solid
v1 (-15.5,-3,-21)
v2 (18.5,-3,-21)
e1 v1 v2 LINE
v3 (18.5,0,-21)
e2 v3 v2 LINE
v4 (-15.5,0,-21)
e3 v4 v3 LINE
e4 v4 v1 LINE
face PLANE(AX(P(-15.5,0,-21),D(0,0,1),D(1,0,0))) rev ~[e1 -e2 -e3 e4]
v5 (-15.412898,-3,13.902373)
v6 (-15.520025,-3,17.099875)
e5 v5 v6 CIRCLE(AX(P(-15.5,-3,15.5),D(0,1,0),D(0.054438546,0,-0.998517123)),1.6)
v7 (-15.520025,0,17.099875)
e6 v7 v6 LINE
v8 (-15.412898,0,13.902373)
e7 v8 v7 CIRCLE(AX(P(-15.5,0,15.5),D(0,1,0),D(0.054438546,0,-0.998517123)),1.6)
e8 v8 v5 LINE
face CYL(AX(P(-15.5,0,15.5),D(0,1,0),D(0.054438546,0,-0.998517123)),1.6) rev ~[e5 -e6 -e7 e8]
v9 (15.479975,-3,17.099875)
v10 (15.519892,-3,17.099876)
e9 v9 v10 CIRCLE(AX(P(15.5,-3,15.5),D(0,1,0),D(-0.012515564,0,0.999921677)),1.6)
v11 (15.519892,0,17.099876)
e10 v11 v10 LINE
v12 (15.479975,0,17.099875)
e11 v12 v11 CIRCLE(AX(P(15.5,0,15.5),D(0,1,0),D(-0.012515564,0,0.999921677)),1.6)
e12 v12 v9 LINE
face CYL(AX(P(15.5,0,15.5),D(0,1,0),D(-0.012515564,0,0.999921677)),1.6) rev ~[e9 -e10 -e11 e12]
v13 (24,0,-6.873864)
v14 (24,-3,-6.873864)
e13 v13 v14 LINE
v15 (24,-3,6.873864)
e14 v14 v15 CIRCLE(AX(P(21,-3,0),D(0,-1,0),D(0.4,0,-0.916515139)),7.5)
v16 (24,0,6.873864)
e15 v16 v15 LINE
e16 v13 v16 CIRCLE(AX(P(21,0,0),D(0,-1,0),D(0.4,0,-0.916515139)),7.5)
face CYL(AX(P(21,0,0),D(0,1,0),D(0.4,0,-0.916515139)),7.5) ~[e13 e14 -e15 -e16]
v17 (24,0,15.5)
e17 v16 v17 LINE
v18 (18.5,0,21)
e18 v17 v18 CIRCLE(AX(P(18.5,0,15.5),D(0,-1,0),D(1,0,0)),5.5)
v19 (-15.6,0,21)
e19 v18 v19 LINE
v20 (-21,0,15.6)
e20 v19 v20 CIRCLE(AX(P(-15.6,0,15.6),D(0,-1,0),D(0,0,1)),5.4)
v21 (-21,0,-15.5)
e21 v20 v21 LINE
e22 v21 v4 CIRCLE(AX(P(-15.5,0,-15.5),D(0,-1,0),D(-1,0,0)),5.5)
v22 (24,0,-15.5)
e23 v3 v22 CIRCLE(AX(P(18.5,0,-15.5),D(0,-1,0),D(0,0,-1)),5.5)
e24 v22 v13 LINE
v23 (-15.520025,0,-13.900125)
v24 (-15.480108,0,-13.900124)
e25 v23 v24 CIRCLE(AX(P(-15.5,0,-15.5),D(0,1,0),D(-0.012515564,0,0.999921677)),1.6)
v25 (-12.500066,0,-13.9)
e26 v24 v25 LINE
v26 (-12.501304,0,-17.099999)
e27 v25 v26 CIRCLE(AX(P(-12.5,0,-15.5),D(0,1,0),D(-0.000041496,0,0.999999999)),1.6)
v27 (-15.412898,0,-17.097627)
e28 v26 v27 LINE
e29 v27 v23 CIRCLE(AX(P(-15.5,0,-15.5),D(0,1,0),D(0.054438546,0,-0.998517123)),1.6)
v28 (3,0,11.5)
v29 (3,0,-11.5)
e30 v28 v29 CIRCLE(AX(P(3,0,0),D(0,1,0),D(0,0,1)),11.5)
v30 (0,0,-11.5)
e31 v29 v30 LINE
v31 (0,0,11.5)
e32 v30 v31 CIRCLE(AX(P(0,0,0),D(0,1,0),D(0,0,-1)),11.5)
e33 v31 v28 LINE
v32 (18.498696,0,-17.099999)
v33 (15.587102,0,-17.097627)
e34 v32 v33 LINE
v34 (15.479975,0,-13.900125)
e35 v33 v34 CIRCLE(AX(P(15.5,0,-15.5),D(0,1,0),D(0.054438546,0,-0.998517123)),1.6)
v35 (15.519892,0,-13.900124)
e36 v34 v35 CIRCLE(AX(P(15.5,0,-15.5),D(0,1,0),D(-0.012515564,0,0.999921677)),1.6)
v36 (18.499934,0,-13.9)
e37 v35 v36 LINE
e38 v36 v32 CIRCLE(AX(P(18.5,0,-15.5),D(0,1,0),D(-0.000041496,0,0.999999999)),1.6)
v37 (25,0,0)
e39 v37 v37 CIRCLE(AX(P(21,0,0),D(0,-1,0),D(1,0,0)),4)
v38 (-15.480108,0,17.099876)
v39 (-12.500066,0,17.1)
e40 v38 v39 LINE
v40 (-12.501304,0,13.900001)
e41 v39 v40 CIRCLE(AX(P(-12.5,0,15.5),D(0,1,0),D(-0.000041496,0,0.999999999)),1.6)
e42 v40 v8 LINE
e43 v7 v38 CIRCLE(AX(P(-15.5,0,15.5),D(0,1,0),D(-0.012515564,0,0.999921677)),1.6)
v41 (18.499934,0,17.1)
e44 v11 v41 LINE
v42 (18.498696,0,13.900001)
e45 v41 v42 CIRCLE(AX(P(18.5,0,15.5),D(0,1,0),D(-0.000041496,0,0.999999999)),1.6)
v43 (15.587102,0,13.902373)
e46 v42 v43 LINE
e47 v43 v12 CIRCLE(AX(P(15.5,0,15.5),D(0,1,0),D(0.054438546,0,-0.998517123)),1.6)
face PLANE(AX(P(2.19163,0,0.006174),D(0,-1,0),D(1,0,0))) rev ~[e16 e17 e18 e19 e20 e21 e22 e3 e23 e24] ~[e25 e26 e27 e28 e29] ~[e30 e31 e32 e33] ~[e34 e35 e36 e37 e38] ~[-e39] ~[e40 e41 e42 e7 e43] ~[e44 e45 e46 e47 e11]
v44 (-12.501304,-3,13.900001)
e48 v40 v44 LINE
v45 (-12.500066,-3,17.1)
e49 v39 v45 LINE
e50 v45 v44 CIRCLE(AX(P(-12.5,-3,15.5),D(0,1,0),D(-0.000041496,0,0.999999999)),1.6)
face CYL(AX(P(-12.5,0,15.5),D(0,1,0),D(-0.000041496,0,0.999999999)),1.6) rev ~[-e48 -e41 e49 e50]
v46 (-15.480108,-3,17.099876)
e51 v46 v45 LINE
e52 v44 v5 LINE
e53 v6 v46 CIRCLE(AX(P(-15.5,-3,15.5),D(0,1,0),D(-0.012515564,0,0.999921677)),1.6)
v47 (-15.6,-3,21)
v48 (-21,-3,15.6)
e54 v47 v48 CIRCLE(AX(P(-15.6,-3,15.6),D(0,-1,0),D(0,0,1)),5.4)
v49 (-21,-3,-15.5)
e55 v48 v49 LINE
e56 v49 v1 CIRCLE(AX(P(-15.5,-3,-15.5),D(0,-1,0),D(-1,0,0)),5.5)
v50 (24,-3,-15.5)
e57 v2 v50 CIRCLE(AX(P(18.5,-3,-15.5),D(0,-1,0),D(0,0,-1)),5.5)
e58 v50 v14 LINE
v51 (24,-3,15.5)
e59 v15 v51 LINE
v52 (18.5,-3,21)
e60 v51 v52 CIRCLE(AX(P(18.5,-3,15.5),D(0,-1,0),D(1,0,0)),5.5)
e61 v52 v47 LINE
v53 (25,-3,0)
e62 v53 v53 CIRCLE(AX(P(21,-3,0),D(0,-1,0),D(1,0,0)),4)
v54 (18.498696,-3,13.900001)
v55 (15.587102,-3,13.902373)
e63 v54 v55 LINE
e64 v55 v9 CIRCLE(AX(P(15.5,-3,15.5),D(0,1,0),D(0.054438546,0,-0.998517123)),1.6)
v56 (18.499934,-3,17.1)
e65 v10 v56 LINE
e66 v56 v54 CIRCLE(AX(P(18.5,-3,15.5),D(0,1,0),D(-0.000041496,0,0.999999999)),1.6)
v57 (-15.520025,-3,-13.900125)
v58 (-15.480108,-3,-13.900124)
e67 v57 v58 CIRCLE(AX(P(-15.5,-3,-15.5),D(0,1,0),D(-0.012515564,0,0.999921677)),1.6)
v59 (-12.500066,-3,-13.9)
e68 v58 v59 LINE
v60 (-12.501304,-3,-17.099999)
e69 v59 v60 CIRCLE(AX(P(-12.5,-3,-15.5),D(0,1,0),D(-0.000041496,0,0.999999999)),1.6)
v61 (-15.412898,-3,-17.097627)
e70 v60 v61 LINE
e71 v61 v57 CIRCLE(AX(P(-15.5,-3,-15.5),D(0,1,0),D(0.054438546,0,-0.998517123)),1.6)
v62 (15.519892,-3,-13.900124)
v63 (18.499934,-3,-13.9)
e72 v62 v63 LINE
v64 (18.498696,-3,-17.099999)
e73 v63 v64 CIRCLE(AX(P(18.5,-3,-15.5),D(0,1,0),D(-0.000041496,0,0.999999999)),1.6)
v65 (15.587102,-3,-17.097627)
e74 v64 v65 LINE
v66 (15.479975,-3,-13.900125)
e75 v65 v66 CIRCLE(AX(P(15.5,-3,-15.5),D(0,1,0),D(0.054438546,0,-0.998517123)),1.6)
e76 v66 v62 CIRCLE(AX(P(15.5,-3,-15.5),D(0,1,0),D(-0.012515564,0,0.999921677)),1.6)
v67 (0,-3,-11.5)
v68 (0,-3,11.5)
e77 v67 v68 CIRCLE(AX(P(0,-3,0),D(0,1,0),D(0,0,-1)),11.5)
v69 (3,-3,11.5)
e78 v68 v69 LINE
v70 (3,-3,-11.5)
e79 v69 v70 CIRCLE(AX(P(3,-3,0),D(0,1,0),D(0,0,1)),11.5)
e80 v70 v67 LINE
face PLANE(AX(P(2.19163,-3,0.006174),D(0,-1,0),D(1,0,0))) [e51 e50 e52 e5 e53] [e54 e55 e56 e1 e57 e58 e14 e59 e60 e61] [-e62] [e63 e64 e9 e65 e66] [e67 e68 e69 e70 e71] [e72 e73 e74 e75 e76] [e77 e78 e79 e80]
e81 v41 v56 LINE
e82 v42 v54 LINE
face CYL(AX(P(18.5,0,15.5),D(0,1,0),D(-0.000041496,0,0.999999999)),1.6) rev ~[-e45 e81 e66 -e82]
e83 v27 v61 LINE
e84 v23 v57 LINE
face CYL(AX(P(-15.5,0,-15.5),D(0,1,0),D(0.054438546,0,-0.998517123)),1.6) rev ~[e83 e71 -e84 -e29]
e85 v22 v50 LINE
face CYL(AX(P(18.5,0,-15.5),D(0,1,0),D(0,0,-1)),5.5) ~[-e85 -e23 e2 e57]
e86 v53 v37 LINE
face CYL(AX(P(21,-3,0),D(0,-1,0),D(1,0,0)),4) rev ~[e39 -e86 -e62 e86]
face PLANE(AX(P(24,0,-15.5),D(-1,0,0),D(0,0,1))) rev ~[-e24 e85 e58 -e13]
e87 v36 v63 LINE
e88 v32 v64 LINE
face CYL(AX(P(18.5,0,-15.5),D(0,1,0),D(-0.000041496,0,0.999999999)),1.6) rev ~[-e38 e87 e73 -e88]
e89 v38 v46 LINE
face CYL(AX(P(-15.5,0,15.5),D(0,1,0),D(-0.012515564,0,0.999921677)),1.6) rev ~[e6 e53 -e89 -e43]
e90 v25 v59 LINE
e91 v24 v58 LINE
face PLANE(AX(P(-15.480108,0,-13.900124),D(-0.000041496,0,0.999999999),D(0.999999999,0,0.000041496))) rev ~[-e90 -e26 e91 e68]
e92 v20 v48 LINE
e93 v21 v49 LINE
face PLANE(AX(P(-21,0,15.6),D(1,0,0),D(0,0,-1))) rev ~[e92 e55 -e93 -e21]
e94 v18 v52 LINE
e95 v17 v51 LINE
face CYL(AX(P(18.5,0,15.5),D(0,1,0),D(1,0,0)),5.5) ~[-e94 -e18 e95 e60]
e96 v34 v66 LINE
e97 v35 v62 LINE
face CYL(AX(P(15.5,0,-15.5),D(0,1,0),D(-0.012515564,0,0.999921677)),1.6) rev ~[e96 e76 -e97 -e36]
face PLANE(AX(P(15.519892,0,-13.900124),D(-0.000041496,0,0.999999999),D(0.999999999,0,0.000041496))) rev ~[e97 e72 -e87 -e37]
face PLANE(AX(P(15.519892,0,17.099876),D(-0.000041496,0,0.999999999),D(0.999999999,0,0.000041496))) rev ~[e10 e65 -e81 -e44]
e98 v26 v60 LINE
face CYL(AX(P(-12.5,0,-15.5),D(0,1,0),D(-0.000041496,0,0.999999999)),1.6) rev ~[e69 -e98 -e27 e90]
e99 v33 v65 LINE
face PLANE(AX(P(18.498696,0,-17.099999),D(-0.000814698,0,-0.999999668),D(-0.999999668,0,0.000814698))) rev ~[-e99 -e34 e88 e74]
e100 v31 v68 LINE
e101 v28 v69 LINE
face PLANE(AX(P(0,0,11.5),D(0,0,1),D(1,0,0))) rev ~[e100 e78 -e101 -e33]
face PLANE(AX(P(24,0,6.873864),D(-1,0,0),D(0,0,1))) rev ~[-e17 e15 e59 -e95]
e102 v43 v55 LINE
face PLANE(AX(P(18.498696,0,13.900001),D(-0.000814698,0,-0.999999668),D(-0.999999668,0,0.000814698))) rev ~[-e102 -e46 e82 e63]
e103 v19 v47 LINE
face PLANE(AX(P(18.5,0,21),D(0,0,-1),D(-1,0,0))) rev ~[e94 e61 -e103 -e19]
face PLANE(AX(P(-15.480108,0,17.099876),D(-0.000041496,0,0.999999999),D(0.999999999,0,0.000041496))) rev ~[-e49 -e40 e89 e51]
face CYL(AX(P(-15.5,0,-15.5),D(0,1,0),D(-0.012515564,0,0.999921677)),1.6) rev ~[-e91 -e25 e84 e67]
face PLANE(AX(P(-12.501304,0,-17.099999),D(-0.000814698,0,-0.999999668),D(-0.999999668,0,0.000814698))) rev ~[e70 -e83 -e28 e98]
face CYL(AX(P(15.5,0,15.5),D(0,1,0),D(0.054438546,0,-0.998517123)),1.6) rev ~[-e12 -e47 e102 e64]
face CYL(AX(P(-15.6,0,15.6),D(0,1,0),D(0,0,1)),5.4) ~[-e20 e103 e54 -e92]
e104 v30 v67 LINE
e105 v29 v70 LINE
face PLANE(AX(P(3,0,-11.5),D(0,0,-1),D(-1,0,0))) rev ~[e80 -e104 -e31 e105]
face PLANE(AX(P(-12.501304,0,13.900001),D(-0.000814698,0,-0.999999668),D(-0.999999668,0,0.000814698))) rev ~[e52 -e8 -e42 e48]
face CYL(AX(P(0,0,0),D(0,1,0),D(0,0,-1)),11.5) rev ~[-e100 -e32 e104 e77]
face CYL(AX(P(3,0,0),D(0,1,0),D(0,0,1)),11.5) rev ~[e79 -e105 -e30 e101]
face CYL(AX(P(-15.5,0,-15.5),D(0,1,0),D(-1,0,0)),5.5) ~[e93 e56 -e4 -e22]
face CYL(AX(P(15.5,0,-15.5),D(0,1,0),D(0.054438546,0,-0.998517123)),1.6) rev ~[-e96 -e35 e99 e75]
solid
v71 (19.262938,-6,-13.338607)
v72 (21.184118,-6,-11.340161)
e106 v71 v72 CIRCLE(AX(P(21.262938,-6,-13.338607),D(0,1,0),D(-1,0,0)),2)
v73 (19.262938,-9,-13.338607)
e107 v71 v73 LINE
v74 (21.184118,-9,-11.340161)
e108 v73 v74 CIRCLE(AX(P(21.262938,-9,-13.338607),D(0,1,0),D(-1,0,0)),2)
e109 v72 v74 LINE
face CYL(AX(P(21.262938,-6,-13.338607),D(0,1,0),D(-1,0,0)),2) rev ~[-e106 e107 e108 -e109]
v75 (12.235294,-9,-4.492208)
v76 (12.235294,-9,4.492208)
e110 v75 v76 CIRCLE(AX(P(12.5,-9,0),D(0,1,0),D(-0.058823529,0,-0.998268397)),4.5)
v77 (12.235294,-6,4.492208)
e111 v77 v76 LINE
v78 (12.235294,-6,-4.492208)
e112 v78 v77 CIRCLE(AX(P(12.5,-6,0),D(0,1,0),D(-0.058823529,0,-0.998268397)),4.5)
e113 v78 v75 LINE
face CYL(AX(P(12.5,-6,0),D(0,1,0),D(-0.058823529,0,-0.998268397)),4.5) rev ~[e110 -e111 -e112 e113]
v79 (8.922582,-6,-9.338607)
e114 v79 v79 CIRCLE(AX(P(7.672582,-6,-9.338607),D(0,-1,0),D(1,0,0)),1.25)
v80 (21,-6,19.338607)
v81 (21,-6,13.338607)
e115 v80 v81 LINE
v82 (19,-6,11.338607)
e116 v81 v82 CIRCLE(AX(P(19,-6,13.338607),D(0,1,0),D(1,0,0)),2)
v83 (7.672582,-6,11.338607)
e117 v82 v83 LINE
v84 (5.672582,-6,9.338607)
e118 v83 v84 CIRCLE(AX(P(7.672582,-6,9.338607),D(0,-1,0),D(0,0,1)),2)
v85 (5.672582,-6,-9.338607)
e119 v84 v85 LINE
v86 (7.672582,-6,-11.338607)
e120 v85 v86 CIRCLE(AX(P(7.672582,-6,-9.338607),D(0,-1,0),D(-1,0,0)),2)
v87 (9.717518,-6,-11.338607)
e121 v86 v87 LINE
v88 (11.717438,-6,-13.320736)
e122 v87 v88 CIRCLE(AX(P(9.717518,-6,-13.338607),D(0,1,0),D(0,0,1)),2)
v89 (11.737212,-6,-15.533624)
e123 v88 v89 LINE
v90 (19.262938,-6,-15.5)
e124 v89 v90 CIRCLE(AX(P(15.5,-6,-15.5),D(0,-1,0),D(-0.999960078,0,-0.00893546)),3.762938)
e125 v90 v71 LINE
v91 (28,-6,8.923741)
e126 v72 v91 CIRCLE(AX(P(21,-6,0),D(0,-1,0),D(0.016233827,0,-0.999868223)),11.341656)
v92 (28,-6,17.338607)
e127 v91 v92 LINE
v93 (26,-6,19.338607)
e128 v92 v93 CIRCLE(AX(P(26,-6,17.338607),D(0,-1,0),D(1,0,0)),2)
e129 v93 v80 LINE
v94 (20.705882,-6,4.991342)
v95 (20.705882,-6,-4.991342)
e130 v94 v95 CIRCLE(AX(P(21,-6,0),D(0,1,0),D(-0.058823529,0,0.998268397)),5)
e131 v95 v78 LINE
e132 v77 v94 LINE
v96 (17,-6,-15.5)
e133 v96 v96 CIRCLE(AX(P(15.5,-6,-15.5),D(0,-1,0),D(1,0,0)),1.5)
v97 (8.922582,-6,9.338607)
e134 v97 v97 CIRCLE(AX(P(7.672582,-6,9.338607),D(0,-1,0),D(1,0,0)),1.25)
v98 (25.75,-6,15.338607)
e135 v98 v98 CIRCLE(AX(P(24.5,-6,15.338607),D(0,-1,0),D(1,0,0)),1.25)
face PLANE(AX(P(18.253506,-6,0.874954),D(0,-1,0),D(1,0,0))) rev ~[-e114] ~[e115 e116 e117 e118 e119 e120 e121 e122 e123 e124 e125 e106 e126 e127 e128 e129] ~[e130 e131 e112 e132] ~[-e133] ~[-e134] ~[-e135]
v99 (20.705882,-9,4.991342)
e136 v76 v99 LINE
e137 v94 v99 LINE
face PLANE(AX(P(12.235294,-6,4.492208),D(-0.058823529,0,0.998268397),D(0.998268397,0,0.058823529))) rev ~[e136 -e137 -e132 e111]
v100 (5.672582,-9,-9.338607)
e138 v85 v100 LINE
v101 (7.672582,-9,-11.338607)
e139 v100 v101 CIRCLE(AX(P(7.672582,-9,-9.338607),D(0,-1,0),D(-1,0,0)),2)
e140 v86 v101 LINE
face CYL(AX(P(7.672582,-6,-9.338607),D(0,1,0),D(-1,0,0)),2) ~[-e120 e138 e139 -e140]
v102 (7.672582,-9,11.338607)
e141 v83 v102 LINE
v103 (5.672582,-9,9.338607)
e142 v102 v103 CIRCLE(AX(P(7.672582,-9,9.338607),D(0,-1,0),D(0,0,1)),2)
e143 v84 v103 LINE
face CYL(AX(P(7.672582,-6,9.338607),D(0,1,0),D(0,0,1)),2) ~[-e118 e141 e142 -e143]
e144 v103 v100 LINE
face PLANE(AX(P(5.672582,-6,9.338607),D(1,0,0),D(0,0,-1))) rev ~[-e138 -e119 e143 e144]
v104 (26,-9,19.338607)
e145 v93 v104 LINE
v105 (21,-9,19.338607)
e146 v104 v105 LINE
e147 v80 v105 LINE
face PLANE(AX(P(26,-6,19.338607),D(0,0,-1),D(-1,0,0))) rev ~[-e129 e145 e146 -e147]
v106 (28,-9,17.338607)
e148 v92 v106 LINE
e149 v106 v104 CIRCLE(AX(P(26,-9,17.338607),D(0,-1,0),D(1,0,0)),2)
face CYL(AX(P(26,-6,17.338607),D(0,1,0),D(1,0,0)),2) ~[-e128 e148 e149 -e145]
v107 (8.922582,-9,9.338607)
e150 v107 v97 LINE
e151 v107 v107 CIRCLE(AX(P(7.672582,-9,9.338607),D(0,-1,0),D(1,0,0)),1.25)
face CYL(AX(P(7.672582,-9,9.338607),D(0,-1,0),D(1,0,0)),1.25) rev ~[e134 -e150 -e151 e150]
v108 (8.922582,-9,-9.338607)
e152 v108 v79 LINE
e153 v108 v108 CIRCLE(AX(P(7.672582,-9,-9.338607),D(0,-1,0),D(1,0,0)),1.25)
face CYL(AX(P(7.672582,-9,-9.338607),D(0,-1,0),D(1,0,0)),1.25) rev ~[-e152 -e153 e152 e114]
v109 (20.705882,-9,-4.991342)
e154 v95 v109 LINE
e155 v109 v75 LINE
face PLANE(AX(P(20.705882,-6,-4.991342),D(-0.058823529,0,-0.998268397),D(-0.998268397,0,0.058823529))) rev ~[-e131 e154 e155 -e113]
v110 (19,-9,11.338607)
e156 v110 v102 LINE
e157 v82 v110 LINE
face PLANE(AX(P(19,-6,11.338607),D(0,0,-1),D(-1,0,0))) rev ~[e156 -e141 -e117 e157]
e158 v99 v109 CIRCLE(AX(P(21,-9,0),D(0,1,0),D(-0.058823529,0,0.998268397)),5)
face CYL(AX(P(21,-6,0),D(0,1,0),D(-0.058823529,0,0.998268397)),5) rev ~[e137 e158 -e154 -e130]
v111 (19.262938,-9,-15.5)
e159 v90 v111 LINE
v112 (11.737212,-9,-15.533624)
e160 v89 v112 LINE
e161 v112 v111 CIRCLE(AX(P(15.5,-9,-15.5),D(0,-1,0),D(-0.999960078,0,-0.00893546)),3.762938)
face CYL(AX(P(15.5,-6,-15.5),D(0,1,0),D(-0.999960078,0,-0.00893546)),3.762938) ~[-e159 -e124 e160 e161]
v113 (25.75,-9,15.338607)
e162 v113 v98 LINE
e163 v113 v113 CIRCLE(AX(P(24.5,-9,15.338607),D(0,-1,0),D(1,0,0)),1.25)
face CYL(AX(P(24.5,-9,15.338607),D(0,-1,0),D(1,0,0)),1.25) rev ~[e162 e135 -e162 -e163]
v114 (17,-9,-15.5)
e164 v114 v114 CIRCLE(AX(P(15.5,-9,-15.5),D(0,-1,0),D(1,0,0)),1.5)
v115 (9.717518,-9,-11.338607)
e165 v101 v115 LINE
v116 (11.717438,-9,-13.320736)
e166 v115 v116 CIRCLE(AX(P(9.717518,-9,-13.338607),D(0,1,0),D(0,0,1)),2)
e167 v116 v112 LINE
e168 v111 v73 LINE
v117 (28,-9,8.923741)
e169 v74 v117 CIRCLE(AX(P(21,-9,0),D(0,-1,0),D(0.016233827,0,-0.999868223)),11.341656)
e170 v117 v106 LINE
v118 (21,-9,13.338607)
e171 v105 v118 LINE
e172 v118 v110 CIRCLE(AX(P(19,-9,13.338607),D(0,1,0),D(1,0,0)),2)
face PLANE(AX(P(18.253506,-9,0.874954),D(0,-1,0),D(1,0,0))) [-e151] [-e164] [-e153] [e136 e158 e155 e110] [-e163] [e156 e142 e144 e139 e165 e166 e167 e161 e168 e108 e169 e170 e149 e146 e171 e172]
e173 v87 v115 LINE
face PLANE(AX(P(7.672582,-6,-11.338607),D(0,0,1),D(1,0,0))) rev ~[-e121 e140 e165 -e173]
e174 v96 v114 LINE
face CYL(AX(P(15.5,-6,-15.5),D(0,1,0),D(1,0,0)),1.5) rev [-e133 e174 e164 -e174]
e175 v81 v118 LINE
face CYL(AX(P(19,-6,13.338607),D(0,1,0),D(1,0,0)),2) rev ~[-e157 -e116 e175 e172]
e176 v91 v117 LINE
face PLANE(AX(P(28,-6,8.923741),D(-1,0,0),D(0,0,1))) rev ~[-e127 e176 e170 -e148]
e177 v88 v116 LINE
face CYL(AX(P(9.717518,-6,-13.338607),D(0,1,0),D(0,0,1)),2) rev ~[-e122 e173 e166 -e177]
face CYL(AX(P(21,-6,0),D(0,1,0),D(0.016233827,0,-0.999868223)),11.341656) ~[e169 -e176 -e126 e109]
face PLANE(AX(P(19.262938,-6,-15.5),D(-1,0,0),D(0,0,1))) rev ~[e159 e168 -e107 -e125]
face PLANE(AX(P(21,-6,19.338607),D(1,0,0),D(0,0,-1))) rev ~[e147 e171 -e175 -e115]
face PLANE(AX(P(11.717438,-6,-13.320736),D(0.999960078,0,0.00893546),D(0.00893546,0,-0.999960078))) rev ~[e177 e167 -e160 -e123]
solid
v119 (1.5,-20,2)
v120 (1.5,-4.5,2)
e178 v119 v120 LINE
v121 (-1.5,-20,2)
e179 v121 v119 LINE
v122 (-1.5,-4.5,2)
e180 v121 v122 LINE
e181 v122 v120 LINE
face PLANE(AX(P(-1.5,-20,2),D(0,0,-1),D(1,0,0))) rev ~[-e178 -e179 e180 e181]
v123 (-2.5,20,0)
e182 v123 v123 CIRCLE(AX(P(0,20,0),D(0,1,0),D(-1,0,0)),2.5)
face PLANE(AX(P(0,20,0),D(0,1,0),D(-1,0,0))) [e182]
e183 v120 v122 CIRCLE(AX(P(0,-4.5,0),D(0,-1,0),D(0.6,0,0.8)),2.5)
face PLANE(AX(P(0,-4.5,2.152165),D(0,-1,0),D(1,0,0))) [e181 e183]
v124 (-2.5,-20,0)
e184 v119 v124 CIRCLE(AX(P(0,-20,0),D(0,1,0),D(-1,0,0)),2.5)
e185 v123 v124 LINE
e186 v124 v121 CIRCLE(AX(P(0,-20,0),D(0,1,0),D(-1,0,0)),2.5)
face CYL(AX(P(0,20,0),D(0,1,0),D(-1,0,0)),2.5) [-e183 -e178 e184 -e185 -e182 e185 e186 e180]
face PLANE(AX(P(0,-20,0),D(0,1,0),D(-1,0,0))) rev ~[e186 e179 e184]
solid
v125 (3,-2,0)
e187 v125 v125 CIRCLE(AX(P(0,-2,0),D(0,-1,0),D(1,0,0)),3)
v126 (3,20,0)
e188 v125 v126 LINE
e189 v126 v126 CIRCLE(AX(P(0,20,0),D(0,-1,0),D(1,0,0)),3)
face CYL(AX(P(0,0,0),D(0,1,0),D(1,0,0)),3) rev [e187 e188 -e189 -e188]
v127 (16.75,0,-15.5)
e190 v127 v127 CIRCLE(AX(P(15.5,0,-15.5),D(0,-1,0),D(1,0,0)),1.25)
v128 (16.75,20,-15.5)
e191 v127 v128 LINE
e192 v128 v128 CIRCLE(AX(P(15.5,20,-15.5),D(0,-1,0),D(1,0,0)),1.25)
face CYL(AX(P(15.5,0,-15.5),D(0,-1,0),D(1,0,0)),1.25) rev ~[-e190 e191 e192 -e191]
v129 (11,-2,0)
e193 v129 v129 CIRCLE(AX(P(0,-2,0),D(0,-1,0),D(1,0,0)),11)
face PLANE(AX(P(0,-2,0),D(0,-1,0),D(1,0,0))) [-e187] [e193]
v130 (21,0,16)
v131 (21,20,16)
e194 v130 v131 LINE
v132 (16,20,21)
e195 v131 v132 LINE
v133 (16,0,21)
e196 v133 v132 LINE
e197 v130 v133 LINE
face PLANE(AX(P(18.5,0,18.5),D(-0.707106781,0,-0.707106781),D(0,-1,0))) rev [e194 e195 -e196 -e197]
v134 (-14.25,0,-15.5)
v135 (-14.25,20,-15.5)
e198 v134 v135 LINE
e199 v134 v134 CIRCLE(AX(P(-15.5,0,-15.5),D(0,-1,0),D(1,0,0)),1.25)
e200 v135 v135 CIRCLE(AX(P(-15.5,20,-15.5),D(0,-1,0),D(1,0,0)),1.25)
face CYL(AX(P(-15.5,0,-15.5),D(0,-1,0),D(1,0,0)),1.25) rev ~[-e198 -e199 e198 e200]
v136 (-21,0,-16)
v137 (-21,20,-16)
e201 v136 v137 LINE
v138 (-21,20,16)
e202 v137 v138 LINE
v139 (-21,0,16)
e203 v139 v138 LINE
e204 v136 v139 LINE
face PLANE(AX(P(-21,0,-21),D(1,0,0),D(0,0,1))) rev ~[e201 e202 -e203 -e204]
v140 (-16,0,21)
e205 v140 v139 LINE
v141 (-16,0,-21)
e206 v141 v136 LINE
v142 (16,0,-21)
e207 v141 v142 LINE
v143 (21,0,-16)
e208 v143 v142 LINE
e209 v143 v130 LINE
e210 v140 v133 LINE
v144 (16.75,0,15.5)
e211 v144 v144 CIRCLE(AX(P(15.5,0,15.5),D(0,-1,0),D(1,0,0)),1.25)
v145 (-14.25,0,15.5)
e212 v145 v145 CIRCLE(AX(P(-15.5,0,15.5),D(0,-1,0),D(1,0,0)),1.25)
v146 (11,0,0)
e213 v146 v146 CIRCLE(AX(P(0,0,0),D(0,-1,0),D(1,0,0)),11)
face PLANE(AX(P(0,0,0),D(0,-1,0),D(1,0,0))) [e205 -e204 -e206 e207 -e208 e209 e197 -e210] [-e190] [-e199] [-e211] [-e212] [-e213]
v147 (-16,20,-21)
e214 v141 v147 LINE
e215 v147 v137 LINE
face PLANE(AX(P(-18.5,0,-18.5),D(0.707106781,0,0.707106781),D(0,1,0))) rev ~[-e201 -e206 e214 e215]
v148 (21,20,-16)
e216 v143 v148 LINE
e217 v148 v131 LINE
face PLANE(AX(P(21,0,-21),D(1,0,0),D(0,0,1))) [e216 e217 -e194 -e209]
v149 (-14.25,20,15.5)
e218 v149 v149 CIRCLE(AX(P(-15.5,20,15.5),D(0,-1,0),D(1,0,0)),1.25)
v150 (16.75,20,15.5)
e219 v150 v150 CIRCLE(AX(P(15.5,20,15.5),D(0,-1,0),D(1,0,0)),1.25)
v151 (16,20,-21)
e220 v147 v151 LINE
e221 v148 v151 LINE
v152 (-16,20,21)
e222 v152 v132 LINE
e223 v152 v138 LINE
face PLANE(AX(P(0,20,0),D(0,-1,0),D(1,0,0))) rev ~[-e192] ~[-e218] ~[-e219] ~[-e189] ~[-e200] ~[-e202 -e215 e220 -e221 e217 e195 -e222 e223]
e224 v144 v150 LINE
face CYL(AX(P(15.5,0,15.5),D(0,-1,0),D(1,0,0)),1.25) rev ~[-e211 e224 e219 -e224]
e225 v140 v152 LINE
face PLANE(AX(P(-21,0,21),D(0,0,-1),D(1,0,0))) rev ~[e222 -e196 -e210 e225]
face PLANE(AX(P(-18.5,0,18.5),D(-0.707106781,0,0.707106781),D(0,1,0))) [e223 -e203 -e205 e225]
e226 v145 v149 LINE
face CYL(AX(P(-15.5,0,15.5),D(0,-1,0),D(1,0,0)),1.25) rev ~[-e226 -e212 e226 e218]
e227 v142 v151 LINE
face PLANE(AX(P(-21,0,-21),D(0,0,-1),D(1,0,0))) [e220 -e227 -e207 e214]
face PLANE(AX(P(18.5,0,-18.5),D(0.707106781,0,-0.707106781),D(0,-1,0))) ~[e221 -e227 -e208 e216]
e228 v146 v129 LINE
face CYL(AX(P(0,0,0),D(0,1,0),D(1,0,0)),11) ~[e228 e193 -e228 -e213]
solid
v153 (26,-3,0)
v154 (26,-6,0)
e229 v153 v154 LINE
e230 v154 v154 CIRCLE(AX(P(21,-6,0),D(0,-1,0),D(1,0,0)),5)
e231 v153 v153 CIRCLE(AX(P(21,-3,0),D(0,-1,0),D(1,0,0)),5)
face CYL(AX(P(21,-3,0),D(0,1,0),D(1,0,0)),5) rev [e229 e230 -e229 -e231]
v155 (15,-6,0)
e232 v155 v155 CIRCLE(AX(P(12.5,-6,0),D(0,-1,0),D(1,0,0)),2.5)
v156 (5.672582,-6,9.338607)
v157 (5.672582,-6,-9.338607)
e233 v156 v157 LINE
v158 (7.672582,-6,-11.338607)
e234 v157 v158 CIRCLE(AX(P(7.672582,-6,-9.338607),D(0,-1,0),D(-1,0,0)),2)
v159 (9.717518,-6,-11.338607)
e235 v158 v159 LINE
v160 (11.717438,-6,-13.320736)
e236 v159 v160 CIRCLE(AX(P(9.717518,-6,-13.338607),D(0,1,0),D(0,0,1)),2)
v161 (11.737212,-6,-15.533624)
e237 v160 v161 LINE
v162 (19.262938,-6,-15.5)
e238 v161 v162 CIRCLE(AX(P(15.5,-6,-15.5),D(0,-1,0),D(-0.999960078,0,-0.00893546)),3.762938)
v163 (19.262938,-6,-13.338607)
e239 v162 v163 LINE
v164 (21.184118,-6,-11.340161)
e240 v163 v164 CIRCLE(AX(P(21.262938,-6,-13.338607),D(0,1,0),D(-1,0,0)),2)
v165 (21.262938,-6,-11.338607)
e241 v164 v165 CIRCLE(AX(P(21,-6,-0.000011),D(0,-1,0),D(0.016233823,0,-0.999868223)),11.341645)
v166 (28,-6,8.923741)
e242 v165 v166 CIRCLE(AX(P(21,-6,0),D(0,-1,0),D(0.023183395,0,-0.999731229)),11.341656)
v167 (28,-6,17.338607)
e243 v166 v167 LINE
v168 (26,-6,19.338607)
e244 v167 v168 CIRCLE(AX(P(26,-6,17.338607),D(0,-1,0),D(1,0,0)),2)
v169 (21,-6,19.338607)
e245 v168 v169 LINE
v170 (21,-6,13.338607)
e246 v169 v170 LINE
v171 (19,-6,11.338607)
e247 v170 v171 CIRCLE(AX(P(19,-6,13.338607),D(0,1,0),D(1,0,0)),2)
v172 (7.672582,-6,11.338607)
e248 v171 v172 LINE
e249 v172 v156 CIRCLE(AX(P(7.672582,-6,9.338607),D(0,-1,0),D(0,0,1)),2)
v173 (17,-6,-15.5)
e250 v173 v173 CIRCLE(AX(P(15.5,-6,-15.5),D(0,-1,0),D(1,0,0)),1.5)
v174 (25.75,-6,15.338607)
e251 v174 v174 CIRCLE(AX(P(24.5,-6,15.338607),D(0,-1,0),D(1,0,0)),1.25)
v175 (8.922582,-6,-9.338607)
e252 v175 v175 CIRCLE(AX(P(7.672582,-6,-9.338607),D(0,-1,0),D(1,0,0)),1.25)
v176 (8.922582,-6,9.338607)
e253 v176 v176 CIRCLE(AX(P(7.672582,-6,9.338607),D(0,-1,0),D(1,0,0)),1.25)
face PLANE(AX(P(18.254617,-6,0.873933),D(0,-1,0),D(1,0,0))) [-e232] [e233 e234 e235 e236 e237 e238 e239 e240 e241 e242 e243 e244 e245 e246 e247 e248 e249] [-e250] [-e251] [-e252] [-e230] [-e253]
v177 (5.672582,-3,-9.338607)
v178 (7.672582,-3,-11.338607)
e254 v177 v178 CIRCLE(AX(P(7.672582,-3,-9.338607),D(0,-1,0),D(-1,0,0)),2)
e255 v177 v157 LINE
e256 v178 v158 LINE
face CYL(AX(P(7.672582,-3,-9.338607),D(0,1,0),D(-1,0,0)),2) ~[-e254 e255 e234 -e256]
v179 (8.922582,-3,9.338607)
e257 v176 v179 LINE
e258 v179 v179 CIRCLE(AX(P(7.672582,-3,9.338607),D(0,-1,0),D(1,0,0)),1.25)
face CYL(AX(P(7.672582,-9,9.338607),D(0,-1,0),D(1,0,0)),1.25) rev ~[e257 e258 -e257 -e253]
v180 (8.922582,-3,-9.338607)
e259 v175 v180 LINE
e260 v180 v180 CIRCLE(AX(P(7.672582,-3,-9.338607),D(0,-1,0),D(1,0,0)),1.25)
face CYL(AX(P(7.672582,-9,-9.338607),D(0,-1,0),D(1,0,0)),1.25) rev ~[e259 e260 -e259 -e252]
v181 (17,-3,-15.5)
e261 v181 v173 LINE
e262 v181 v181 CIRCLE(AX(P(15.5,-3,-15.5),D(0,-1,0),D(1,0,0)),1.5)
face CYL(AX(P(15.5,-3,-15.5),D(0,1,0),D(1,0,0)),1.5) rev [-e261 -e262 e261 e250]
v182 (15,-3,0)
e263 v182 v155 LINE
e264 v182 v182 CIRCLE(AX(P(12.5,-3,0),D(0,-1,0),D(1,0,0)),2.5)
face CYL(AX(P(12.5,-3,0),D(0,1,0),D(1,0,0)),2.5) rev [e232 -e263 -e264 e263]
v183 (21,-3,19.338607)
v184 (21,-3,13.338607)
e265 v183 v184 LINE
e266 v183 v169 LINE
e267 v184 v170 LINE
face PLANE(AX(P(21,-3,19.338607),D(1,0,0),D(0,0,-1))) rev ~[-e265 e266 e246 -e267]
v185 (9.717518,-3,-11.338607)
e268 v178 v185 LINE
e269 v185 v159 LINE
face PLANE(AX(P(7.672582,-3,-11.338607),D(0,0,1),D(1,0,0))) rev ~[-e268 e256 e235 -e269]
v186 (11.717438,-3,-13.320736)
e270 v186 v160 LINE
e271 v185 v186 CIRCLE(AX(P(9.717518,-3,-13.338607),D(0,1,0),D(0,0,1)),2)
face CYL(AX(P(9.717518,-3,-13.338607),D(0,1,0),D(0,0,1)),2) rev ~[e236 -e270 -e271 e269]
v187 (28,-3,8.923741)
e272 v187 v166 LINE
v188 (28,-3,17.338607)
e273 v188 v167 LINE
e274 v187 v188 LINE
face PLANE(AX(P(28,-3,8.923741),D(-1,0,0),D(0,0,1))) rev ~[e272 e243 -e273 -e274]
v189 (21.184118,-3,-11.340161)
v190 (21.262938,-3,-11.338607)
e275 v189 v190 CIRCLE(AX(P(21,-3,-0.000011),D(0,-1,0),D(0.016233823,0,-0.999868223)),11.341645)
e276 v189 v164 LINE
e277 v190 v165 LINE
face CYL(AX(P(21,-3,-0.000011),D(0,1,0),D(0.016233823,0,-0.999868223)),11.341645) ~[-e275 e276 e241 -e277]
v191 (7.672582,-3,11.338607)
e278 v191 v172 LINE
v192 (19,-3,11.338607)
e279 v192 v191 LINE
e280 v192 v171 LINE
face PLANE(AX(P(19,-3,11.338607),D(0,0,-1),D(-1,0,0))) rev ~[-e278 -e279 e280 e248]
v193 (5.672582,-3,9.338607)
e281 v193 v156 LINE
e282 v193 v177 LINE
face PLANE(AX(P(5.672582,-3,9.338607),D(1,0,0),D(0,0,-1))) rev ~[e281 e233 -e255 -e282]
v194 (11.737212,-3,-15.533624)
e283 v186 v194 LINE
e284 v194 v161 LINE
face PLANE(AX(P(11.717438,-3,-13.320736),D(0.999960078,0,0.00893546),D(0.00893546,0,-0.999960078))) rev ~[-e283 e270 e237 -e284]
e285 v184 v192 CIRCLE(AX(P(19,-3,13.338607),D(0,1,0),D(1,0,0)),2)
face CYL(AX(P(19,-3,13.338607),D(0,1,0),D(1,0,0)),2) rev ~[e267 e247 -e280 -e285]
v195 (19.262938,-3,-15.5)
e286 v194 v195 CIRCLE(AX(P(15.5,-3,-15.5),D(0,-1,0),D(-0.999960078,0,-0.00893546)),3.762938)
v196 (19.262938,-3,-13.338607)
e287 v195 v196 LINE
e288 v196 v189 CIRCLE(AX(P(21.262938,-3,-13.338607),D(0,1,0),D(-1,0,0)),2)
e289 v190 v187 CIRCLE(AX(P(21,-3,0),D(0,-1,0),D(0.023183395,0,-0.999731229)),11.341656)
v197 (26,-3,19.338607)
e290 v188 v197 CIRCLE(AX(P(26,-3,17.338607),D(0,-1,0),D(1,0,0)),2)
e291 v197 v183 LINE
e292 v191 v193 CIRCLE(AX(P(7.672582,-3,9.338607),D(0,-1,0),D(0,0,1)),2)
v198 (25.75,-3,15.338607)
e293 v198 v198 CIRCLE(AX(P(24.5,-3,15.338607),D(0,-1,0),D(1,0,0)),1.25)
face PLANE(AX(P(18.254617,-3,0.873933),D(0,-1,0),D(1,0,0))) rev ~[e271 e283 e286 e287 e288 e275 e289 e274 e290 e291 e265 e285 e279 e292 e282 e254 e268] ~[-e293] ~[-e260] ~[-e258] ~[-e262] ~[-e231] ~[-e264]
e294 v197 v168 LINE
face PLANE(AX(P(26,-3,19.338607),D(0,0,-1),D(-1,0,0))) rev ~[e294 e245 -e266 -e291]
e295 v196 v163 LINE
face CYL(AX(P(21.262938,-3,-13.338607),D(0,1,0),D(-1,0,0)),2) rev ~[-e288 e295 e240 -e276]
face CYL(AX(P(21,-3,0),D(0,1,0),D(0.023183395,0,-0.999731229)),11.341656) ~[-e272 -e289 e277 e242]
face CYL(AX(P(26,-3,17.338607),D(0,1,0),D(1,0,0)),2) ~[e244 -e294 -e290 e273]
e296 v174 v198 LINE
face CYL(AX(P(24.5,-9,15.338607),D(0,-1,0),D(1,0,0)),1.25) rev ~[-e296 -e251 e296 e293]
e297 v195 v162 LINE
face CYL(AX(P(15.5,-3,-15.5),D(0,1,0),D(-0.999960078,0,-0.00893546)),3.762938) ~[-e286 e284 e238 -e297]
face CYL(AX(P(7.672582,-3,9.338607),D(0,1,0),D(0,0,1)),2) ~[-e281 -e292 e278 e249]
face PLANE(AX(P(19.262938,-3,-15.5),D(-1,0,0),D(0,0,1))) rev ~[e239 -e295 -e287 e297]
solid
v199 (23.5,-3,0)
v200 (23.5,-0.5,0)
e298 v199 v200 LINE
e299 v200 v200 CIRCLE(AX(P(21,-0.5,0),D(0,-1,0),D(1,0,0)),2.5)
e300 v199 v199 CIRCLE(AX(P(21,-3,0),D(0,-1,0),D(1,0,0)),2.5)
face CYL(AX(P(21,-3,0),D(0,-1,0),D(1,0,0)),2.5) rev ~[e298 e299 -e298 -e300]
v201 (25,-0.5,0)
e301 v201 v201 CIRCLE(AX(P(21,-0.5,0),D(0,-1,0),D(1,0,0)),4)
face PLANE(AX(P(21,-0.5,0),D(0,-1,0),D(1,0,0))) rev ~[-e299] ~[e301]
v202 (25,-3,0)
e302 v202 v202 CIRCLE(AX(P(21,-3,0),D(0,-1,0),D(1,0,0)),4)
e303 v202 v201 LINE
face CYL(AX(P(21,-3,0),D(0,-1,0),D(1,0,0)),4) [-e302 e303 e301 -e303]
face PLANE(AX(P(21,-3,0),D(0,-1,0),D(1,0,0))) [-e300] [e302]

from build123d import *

# Parameters (mm, degrees)
F0_W      = 42
F0_H      = 42
F0_R      = 1.25
F0_R_2    = 11
F0_R_3    = 3
F1_DEPTH  = 20
F2_DEPTH  = 2
F3_SIZE   = 5
F4_R      = 2.5
F5_DEPTH  = 40
F7_DEPTH  = 15.5
F9_DEPTH  = 3
F10_R     = 4
F11_DEPTH = 25
F12_R     = 4
F12_R_2   = 2.5
F13_DEPTH = 2.5
F14_R     = 1.5
F14_R_2   = 2.5
F14_R_3   = 5
F15_DEPTH = 3
F16_R     = 1.5
F17_DEPTH = 3
F18_R     = 1.25
F19_DEPTH = 25


with BuildPart() as f1:
    # F0 (on Front) → F1 (new body)
    with BuildSketch(Plane.XZ):
        Rectangle(F0_W, F0_H)
        with Locations((-15.5, -15.5)):
            Circle(F0_R, mode=Mode.SUBTRACT)
        with Locations((15.5, -15.5)):
            Circle(F0_R, mode=Mode.SUBTRACT)
        with Locations((-15.5, 15.5)):
            Circle(F0_R, mode=Mode.SUBTRACT)
        Circle(F0_R_2, mode=Mode.SUBTRACT)
        with Locations((15.5, 15.5)):
            Circle(F0_R, mode=Mode.SUBTRACT)
        Circle(F0_R_2)
        Circle(F0_R_3, mode=Mode.SUBTRACT)
    extrude(amount=-F1_DEPTH)

    # F0 (on Front) → F2 (join)
    with BuildSketch(Plane.XZ):
        Circle(F0_R_2)
        Circle(F0_R_3, mode=Mode.SUBTRACT)
    extrude(amount=F2_DEPTH)

    # F3
    f3_edges = [f1.edges().sort_by_distance(p)[0] for p in [
        (-21, 10, 21),
        (21, 10, 21),
        (21, 10, -21),
        (-21, 10, -21),
    ]]
    chamfer(f3_edges, length=F3_SIZE)


with BuildPart() as f5:
    # F4 (on face) → F5 (new body)
    with BuildSketch(Plane(origin=(0, 20, 0), x_dir=(-1, 0, 0), z_dir=(0, 1, 0))):
        Circle(F4_R)
    extrude(amount=-F5_DEPTH)

    # F6 (on face) → F7 (cut)
    with BuildSketch(Plane.XZ.offset(20)):
        with BuildLine():
            ThreePointArc((1.5, 2), (0, 2.5), (-1.5, 2))
            Line((-1.5, 2), (1.5, 2))
        make_face()
    extrude(amount=-F7_DEPTH, mode=Mode.SUBTRACT)


with BuildPart() as f9:
    # F8 (on face) → F9 (new body)
    with BuildSketch(Plane.XZ):
        with BuildLine():
            Line((-15.5, -21), (18.5, -21))
            ThreePointArc((18.5, -21), (22.3890872965, -19.3890872965), (24, -15.5))
            Line((24, -15.5), (24, -6.8738635424))
            ThreePointArc((24, -6.8738635424), (28.5, 0), (24, 6.8738635424))
            Line((24, 6.8738635424), (24, 15.5))
            ThreePointArc((24, 15.5), (22.3890872965, 19.3890872965), (18.5, 21))
            Line((18.5, 21), (-15.6, 21))
            ThreePointArc((-15.6, 21), (-19.4183766184, 19.4183766184), (-21, 15.6))
            Line((-21, 15.6), (-21, -15.5))
            ThreePointArc((-21, -15.5), (-19.3890872965, -19.3890872965), (-15.5, -21))
        make_face()
        with BuildLine():
            ThreePointArc((-15.5200249009, -13.9001253164), (-15.500066393, -13.9000000014), (-15.4801078747, -13.90012366))
            Line((-15.4801078747, -13.90012366), (-12.500066393, -13.9000000014))
            ThreePointArc((-12.500066393, -13.9000000014), (-10.9000001196, -15.5006185623), (-12.5013035174, -17.099999469))
            Line((-12.5013035174, -17.099999469), (-15.4128983262, -17.0976273966))
            ThreePointArc((-15.4128983262, -17.0976273966), (-17.0991027833, -15.5535750719), (-15.5200249009, -13.9001253164))
        make_face(mode=Mode.SUBTRACT)
        with BuildLine():
            ThreePointArc((15.4799750991, -13.9001253164), (15.499933607, -13.9000000014), (15.5198921253, -13.90012366))
            Line((15.5198921253, -13.90012366), (18.499933607, -13.9000000014))
            ThreePointArc((18.499933607, -13.9000000014), (20.0999998804, -15.5006185623), (18.4986964826, -17.099999469))
            Line((18.4986964826, -17.099999469), (15.5871016738, -17.0976273966))
            ThreePointArc((15.5871016738, -17.0976273966), (13.9008972167, -15.5535750719), (15.4799750991, -13.9001253164))
        make_face(mode=Mode.SUBTRACT)
        with BuildLine():
            ThreePointArc((3, 11.5), (14.5, 0), (3, -11.5))
            Line((3, -11.5), (0, -11.5))
            ThreePointArc((0, -11.5), (-11.5, 0), (0, 11.5))
            Line((0, 11.5), (3, 11.5))
        make_face(mode=Mode.SUBTRACT)
        with BuildLine():
            ThreePointArc((-15.5200249009, 17.0998746836), (-15.500066393, 17.0999999986), (-15.4801078747, 17.09987634))
            Line((-15.4801078747, 17.09987634), (-12.500066393, 17.0999999986))
            ThreePointArc((-12.500066393, 17.0999999986), (-10.9000001196, 15.4993814377), (-12.5013035174, 13.900000531))
            Line((-12.5013035174, 13.900000531), (-15.4128983262, 13.9023726034))
            ThreePointArc((-15.4128983262, 13.9023726034), (-17.0991027833, 15.4464249281), (-15.5200249009, 17.0998746836))
        make_face(mode=Mode.SUBTRACT)
        with BuildLine():
            ThreePointArc((15.4799750991, 17.0998746836), (15.499933607, 17.0999999986), (15.5198921253, 17.09987634))
            Line((15.5198921253, 17.09987634), (18.499933607, 17.0999999986))
            ThreePointArc((18.499933607, 17.0999999986), (20.0999998804, 15.4993814377), (18.4986964826, 13.900000531))
            Line((18.4986964826, 13.900000531), (15.5871016738, 13.9023726034))
            ThreePointArc((15.5871016738, 13.9023726034), (13.9008972167, 15.4464249281), (15.4799750991, 17.0998746836))
        make_face(mode=Mode.SUBTRACT)
    extrude(amount=F9_DEPTH)

    # F10 (on face) → F11 (cut)
    with BuildSketch(Plane.XZ.offset(3)):
        with Locations((21, 0)):
            Circle(F10_R)
    extrude(amount=-F11_DEPTH, mode=Mode.SUBTRACT)


with BuildPart() as f13:
    # F12 (on face) → F13 (new body)
    with BuildSketch(Plane.XZ.offset(3)):
        with Locations((21, 0)):
            Circle(F12_R)
        with Locations((21, 0)):
            Circle(F12_R_2, mode=Mode.SUBTRACT)
    extrude(amount=-F13_DEPTH)


with BuildPart() as f15:
    # F14 (on face) → F15 (new body)
    with BuildSketch(Plane.XZ.offset(3)):
        with BuildLine():
            Line((5.6725820601, 9.3386074081), (5.6725820601, -9.3386074081))
            ThreePointArc((5.6725820601, -9.3386074081), (6.2583684977, -10.7528209705), (7.6725820601, -11.3386074081))
            Line((7.6725820601, -11.3386074081), (9.7175180337, -11.3386074081))
            ThreePointArc((9.7175180337, -11.3386074081), (11.1253990941, -11.918089573), (11.7174381896, -13.3207364883))
            Line((11.7174381896, -13.3207364883), (11.737212143, -15.5336235823))
            ThreePointArc((11.737212143, -15.5336235823), (15.516811959, -19.2629005249), (19.2629380811, -15.5))
            Line((19.2629380811, -15.5), (19.2629380811, -13.3386074081))
            ThreePointArc((19.2629380811, -13.3386074081), (19.8211268568, -11.9525408897), (21.1841184746, -11.3401611442))
            ThreePointArc((21.1841184746, -11.3401611442), (21.2235206216, -11.3389958799), (21.2629380811, -11.3386074081))
            ThreePointArc((21.2629380811, -11.3386074081), (31.7623537708, -3.5783928938), (28, 8.9237410535))
            Line((28, 8.9237410535), (28, 17.3386074081))
            ThreePointArc((28, 17.3386074081), (27.4142135624, 18.7528209705), (26, 19.3386074081))
            Line((26, 19.3386074081), (21, 19.3386074081))
            Line((21, 19.3386074081), (21, 13.3386074081))
            ThreePointArc((21, 13.3386074081), (20.4142135624, 11.9243938457), (19, 11.3386074081))
            Line((19, 11.3386074081), (7.6725820601, 11.3386074081))
            ThreePointArc((7.6725820601, 11.3386074081), (6.2583684977, 10.7528209705), (5.6725820601, 9.3386074081))
        make_face()
        with Locations((15.5, -15.5)):
            Circle(F14_R, mode=Mode.SUBTRACT)
        with Locations((12.5, 0)):
            Circle(F14_R_2, mode=Mode.SUBTRACT)
        with Locations((21, 0)):
            Circle(F14_R_3, mode=Mode.SUBTRACT)
        with BuildLine():
            ThreePointArc((21.2629380811, -11.3386074081), (21.2235206216, -11.3389958799), (21.1841184746, -11.3401611442))
            ThreePointArc((21.1841184746, -11.3401611442), (21.2235296278, -11.33945276), (21.2629380811, -11.3386074081))
        make_face()
    extrude(amount=F15_DEPTH)


with BuildPart() as f17:
    # F16 (on face) → F17 (new body)
    with BuildSketch(Plane.XZ.offset(6)):
        with BuildLine():
            ThreePointArc((19.2629380811, -13.3386074081), (19.8211268568, -11.9525408897), (21.1841184746, -11.3401611442))
            ThreePointArc((21.1841184746, -11.3401611442), (31.7498522145, -3.6157754018), (28, 8.9237410535))
            Line((28, 8.9237410535), (28, 17.3386074081))
            ThreePointArc((28, 17.3386074081), (27.4142135624, 18.7528209705), (26, 19.3386074081))
            Line((26, 19.3386074081), (21, 19.3386074081))
            Line((21, 19.3386074081), (21, 13.3386074081))
            ThreePointArc((21, 13.3386074081), (20.4142135624, 11.9243938457), (19, 11.3386074081))
            Line((19, 11.3386074081), (7.6725820601, 11.3386074081))
            ThreePointArc((7.6725820601, 11.3386074081), (6.2583684977, 10.7528209705), (5.6725820601, 9.3386074081))
            Line((5.6725820601, 9.3386074081), (5.6725820601, -9.3386074081))
            ThreePointArc((5.6725820601, -9.3386074081), (6.2583684977, -10.7528209705), (7.6725820601, -11.3386074081))
            Line((7.6725820601, -11.3386074081), (9.7175180337, -11.3386074081))
            ThreePointArc((9.7175180337, -11.3386074081), (11.1253990941, -11.918089573), (11.7174381896, -13.3207364883))
            Line((11.7174381896, -13.3207364883), (11.737212143, -15.5336235823))
            ThreePointArc((11.737212143, -15.5336235823), (15.516811959, -19.2629005249), (19.2629380811, -15.5))
            Line((19.2629380811, -15.5), (19.2629380811, -13.3386074081))
        make_face()
        with Locations((15.5, -15.5)):
            Circle(F16_R, mode=Mode.SUBTRACT)
        with BuildLine():
            ThreePointArc((20.7058823529, 4.9913419848), (26, 0), (20.7058823529, -4.9913419848))
            Line((20.7058823529, -4.9913419848), (12.2352941176, -4.4922077864))
            ThreePointArc((12.2352941176, -4.4922077864), (8, 0), (12.2352941176, 4.4922077864))
            Line((12.2352941176, 4.4922077864), (20.7058823529, 4.9913419848))
        make_face(mode=Mode.SUBTRACT)
    extrude(amount=F17_DEPTH)


with BuildPart() as f19_tool:
    # F18 (on face) → F19 (new body)
    with BuildSketch(Plane.XZ.offset(9)):
        with Locations((24.5, 15.3386074081)):
            Circle(F18_R)
        with Locations((7.6725820601, 9.3386074081)):
            Circle(F18_R)
        with Locations((7.6725820601, -9.3386074081)):
            Circle(F18_R)
    extrude(amount=-F19_DEPTH)


with BuildPart() as f15_1:
    add(f15.part)

    # F19: cut by f19_tool
    add(f19_tool.part, mode=Mode.SUBTRACT)


with BuildPart() as f17_1:
    add(f17.part)

    # F19: cut by f19_tool
    add(f19_tool.part, mode=Mode.SUBTRACT)


solid = Compound([f1.part, f5.part, f9.part, f13.part, f15_1.part, f17_1.part])
